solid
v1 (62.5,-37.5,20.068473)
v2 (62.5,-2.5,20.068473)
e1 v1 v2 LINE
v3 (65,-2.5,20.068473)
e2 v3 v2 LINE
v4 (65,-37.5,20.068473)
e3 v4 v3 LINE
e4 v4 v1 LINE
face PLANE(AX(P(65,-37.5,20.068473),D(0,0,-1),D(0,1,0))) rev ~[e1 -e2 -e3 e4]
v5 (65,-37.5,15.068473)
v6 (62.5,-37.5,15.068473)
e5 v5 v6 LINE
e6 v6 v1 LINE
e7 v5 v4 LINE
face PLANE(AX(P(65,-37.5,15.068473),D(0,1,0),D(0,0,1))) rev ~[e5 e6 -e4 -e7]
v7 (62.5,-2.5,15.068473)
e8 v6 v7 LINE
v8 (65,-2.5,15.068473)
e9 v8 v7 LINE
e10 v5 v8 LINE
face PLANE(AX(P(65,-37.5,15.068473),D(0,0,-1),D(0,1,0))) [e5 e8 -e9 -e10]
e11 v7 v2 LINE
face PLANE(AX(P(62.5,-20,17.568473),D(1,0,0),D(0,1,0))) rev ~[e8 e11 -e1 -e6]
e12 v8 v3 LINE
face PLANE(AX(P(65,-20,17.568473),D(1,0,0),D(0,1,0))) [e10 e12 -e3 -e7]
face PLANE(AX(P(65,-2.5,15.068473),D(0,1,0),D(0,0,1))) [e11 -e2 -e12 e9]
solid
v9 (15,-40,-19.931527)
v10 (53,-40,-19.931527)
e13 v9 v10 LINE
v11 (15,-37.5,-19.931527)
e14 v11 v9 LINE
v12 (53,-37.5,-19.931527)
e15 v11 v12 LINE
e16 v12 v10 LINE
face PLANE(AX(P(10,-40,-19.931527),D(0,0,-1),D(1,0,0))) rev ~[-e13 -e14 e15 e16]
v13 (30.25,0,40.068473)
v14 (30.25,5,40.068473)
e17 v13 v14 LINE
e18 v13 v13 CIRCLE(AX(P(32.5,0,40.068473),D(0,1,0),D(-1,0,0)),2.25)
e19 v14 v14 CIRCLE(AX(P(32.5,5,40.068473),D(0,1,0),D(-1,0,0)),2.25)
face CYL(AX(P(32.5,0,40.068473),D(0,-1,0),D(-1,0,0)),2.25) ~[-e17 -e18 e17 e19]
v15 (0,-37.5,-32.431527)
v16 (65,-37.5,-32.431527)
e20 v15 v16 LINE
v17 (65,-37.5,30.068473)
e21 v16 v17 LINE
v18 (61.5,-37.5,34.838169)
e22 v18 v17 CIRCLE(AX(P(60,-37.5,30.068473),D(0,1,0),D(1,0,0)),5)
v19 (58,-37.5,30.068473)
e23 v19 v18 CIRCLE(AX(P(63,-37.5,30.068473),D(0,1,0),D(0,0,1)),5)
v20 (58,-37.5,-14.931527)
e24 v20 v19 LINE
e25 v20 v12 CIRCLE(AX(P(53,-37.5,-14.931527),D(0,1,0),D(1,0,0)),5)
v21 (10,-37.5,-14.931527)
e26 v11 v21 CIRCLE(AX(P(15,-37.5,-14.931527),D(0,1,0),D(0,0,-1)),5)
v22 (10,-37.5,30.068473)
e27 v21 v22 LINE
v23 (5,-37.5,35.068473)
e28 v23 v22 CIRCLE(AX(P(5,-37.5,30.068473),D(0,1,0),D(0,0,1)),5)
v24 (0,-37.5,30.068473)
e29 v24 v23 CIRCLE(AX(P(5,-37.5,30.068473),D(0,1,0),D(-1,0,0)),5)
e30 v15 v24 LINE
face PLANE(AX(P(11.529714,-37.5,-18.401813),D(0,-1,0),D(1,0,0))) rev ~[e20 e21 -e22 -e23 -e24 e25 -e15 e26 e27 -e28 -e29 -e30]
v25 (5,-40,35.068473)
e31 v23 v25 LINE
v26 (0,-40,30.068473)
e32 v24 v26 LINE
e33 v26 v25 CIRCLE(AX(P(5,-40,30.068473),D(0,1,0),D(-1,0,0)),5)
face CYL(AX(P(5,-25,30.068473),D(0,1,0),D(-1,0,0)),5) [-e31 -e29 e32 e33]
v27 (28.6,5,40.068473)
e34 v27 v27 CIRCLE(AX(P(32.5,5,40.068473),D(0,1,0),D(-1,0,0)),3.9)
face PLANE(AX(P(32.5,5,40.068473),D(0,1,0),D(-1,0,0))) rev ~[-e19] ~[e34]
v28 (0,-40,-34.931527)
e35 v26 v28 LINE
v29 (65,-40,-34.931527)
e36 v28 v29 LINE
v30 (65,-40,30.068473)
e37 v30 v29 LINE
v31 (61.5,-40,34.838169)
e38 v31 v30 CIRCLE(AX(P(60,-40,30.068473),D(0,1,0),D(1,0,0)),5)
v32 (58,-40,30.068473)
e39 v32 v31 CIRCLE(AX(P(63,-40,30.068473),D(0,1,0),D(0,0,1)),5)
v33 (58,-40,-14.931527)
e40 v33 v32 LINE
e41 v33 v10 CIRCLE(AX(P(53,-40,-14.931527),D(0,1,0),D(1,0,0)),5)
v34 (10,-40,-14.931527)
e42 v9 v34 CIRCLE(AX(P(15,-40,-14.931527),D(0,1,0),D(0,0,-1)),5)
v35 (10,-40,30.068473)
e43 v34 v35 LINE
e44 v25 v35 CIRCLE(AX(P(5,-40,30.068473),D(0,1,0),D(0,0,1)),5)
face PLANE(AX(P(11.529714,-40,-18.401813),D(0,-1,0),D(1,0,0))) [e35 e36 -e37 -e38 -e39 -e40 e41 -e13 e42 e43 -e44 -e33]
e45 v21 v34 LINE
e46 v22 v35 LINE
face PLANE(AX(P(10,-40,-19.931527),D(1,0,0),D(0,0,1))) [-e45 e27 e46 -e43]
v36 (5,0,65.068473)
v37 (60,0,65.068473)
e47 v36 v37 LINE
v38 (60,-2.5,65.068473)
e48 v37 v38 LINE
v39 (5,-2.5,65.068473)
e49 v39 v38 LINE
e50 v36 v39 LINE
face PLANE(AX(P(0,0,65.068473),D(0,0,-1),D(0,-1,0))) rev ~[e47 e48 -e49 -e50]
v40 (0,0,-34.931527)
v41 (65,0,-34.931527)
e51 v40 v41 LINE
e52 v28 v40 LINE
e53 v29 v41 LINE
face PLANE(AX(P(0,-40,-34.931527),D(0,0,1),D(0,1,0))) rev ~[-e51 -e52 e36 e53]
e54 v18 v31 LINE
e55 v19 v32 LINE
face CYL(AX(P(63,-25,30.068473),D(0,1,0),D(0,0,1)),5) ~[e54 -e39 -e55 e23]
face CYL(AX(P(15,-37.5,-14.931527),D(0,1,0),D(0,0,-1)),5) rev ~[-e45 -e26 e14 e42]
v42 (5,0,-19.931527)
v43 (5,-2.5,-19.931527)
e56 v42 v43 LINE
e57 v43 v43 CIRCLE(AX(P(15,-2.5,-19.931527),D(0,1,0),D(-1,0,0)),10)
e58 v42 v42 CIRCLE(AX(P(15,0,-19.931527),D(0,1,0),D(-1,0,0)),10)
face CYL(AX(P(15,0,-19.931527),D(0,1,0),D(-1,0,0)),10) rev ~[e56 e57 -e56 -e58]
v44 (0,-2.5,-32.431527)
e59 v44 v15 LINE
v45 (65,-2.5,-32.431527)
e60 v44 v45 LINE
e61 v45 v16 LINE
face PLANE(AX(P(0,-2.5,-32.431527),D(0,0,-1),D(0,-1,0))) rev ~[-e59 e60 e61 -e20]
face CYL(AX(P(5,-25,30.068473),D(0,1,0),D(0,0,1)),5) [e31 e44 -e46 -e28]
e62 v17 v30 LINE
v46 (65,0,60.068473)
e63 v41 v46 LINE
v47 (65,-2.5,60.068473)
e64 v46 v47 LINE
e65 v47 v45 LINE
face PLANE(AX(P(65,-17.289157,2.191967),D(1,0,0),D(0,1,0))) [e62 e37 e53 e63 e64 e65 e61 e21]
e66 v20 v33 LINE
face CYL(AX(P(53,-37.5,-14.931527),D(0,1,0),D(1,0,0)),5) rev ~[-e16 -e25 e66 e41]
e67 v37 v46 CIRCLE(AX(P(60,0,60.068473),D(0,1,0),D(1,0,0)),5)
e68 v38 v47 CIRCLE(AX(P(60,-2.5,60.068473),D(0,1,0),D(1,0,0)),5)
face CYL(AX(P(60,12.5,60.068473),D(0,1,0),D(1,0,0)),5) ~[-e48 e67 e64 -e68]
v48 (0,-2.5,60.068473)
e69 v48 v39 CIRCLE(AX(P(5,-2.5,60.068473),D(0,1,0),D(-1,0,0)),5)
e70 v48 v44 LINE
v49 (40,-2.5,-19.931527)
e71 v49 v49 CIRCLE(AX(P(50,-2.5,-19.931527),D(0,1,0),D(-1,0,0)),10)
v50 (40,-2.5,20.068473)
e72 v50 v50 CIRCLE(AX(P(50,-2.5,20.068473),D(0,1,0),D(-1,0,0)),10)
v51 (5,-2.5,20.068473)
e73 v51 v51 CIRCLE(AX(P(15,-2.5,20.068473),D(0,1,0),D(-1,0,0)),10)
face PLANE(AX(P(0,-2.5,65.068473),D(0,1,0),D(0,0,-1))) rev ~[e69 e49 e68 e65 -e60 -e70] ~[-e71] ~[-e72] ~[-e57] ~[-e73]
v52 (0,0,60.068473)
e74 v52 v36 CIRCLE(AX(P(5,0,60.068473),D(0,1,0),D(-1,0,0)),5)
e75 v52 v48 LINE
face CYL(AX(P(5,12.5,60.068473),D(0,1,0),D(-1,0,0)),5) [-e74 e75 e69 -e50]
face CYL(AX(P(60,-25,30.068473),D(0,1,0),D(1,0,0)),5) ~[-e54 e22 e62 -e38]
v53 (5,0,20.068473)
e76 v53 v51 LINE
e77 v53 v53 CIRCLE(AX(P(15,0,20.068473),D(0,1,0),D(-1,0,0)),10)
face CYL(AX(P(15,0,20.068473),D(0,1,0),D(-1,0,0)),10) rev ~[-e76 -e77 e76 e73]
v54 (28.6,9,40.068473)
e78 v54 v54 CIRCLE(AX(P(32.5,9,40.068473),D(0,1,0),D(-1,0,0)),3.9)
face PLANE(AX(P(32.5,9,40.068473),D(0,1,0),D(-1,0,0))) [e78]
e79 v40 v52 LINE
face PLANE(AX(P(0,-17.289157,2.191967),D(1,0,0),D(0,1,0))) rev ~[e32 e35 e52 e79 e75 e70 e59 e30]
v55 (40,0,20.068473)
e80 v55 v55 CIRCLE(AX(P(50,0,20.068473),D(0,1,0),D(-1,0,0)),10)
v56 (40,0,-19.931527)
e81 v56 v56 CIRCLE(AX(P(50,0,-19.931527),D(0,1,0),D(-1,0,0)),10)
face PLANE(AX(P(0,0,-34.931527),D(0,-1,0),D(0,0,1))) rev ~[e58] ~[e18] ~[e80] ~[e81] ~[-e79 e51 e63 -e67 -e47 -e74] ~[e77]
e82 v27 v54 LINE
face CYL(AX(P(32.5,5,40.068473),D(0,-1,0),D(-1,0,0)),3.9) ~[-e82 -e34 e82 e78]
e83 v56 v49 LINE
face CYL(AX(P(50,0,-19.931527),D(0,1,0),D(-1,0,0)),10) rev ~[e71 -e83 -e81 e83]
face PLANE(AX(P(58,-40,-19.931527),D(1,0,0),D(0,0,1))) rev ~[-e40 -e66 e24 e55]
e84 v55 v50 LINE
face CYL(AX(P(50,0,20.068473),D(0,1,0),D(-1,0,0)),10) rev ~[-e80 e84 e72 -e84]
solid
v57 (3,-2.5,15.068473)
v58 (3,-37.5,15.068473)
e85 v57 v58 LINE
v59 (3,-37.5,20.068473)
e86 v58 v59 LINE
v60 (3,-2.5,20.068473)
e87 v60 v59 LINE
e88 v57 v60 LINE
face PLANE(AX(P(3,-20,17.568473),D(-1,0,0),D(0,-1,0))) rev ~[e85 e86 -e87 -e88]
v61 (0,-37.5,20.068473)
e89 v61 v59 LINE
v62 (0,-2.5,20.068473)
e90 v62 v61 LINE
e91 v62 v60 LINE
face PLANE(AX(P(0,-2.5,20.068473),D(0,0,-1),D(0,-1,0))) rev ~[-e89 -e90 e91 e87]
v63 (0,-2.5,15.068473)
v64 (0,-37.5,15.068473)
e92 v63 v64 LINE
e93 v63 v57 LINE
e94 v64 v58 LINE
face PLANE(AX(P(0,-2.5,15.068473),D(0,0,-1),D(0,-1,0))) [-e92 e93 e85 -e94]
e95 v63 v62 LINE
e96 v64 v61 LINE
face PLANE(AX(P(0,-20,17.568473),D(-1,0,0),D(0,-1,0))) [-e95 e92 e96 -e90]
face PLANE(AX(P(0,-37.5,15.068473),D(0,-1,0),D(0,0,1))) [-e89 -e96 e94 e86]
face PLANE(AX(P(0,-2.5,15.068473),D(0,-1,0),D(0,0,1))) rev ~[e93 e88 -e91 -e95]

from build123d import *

# Parameters (mm, degrees)
F1_DEPTH     = 65
F2_W         = 48
F2_H         = 55
F3_DEPTH     = 10
F4_R         = 2.25
F5_DEPTH     = 5
F6_R         = 3.9
F6_R_2       = 2.25
F7_DEPTH     = 4
F8_R         = 10
F9_DEPTH     = 4
F10_W        = 35
F10_H        = 5
F11_DEPTH    = 2.5
F12_W        = 35
F12_H        = 5
F13_DEPTH    = 3
F14_T1_DEPTH = 2.5
F14_T3_DEPTH = 27.5
F14_T5_DEPTH = 27.5


# Not quite as in the source:
# - a fillet or chamfer that OpenCascade refuses, or shapes differently, is made with other operations: its cross-section is extruded or revolved along the edge and cut away or added


with BuildPart() as f1:
    # F0 (on Right) → F1 (new body)
    with BuildSketch(Plane.YZ):
        Polygon((0, -34.9315267816), (0, 65.0684732184), (-2.5, 65.0684732184), (-2.5, -32.4315267816), (-37.5, -32.4315267816), (-37.5, 35.0684732184), (-40, 35.0684732184), (-40, -34.9315267816), align=None)
    extrude(amount=F1_DEPTH)

    # F2 (on face) → F3 (cut)
    with BuildSketch(Plane.XZ.offset(40)):
        with Locations((34, 7.5684732184)):
            Rectangle(F2_W, F2_H)
    extrude(amount=-F3_DEPTH, mode=Mode.SUBTRACT)

    # F4 (on face) → F5 (join)
    with BuildSketch(Plane(origin=(0, 0, 0), x_dir=(-1, 0, 0), z_dir=(0, 1, 0))):
        with Locations((-32.5, 40.0684732184)):
            Circle(F4_R)
    extrude(amount=F5_DEPTH)

    # F6 (on face) → F7 (join)
    with BuildSketch(Plane(origin=(0, 5, 0), x_dir=(-1, 0, 0), z_dir=(0, 1, 0))):
        with Locations((-32.5, 40.0684732184)):
            Circle(F6_R)
        with Locations((-32.5, 40.0684732184)):
            Circle(F6_R_2, mode=Mode.SUBTRACT)
        with Locations((-32.5, 40.0684732184)):
            Circle(F6_R_2)
    extrude(amount=F7_DEPTH)

    # F8 (on face) → F9 (cut)
    with BuildSketch(Plane(origin=(0, 0, 0), x_dir=(-1, 0, 0), z_dir=(0, 1, 0))):
        with Locations((-50, 20.0684732184)):
            Circle(F8_R)
        with Locations((-15, 20.0684732184)):
            Circle(F8_R)
        with Locations((-15, -19.9315267816)):
            Circle(F8_R)
        with Locations((-50, -19.9315267816)):
            Circle(F8_R)
    extrude(amount=-F9_DEPTH, mode=Mode.SUBTRACT)

    # F14: fillet of radius 5 on 8 edges, made by hand

    # F14_s2 → F14_t1 (join)
    with BuildSketch(Plane.XZ.offset(37.5)):
        with BuildLine():
            ThreePointArc((15, -19.9315267816), (11.4644660941, -18.4670606876), (10, -14.9315267816))
            Line((10, -14.9315267816), (10, -19.9315267816))
            Line((10, -19.9315267816), (15, -19.9315267816))
        make_face()
        with BuildLine():
            ThreePointArc((58, -14.9315267816), (56.5355339059, -18.4670606876), (53, -19.9315267816))
            Line((53, -19.9315267816), (58, -19.9315267816))
            Line((58, -19.9315267816), (58, -14.9315267816))
        make_face()
    extrude(amount=F14_T1_DEPTH)

    # F14_s4 → F14_t3 (cut)
    with BuildSketch(Plane.XZ.offset(25)):
        with BuildLine():
            ThreePointArc((0, 30.0684732184), (1.4644660941, 33.6040071243), (5, 35.0684732184))
            Line((5, 35.0684732184), (0, 35.0684732184))
            Line((0, 35.0684732184), (0, 30.0684732184))
        make_face()
        with BuildLine():
            ThreePointArc((5, 35.0684732184), (8.5355339059, 33.6040071243), (10, 30.0684732184))
            Line((10, 30.0684732184), (10, 35.0684732184))
            Line((10, 35.0684732184), (5, 35.0684732184))
        make_face()
        with BuildLine():
            ThreePointArc((63, 35.0684732184), (59.4644660941, 33.6040071243), (58, 30.0684732184))
            Line((58, 30.0684732184), (58, 35.0684732184))
            Line((58, 35.0684732184), (63, 35.0684732184))
        make_face()
        with BuildLine():
            ThreePointArc((65, 30.0684732184), (63.5355339059, 33.6040071243), (60, 35.0684732184))
            Line((60, 35.0684732184), (65, 35.0684732184))
            Line((65, 35.0684732184), (65, 30.0684732184))
        make_face()
    extrude(amount=F14_T3_DEPTH, mode=Mode.SUBTRACT)

    # F14_s6 → F14_t5 (cut)
    with BuildSketch(Plane.XZ.offset(-12.5)):
        with BuildLine():
            ThreePointArc((65, 60.0684732184), (63.5355339059, 63.6040071243), (60, 65.0684732184))
            Line((60, 65.0684732184), (65, 65.0684732184))
            Line((65, 65.0684732184), (65, 60.0684732184))
        make_face()
        with BuildLine():
            ThreePointArc((0, 60.0684732184), (1.4644660941, 63.6040071243), (5, 65.0684732184))
            Line((5, 65.0684732184), (0, 65.0684732184))
            Line((0, 65.0684732184), (0, 60.0684732184))
        make_face()
    extrude(amount=F14_T5_DEPTH, mode=Mode.SUBTRACT)


with BuildPart() as f11:
    # F10 (on face) → F11 (new body)
    with BuildSketch(Plane.YZ.offset(65)):
        with Locations((-20, 17.5684732184)):
            Rectangle(F10_W, F10_H)
    extrude(amount=-F11_DEPTH)


with BuildPart() as f13:
    # F12 (on face) → F13 (new body)
    with BuildSketch(Plane(origin=(0, 0, 0), x_dir=(0, -1, 0), z_dir=(-1, 0, 0))):
        with Locations((20, 17.5684732184)):
            Rectangle(F12_W, F12_H)
    extrude(amount=-F13_DEPTH)


solid = Compound([f1.part, f11.part, f13.part])
